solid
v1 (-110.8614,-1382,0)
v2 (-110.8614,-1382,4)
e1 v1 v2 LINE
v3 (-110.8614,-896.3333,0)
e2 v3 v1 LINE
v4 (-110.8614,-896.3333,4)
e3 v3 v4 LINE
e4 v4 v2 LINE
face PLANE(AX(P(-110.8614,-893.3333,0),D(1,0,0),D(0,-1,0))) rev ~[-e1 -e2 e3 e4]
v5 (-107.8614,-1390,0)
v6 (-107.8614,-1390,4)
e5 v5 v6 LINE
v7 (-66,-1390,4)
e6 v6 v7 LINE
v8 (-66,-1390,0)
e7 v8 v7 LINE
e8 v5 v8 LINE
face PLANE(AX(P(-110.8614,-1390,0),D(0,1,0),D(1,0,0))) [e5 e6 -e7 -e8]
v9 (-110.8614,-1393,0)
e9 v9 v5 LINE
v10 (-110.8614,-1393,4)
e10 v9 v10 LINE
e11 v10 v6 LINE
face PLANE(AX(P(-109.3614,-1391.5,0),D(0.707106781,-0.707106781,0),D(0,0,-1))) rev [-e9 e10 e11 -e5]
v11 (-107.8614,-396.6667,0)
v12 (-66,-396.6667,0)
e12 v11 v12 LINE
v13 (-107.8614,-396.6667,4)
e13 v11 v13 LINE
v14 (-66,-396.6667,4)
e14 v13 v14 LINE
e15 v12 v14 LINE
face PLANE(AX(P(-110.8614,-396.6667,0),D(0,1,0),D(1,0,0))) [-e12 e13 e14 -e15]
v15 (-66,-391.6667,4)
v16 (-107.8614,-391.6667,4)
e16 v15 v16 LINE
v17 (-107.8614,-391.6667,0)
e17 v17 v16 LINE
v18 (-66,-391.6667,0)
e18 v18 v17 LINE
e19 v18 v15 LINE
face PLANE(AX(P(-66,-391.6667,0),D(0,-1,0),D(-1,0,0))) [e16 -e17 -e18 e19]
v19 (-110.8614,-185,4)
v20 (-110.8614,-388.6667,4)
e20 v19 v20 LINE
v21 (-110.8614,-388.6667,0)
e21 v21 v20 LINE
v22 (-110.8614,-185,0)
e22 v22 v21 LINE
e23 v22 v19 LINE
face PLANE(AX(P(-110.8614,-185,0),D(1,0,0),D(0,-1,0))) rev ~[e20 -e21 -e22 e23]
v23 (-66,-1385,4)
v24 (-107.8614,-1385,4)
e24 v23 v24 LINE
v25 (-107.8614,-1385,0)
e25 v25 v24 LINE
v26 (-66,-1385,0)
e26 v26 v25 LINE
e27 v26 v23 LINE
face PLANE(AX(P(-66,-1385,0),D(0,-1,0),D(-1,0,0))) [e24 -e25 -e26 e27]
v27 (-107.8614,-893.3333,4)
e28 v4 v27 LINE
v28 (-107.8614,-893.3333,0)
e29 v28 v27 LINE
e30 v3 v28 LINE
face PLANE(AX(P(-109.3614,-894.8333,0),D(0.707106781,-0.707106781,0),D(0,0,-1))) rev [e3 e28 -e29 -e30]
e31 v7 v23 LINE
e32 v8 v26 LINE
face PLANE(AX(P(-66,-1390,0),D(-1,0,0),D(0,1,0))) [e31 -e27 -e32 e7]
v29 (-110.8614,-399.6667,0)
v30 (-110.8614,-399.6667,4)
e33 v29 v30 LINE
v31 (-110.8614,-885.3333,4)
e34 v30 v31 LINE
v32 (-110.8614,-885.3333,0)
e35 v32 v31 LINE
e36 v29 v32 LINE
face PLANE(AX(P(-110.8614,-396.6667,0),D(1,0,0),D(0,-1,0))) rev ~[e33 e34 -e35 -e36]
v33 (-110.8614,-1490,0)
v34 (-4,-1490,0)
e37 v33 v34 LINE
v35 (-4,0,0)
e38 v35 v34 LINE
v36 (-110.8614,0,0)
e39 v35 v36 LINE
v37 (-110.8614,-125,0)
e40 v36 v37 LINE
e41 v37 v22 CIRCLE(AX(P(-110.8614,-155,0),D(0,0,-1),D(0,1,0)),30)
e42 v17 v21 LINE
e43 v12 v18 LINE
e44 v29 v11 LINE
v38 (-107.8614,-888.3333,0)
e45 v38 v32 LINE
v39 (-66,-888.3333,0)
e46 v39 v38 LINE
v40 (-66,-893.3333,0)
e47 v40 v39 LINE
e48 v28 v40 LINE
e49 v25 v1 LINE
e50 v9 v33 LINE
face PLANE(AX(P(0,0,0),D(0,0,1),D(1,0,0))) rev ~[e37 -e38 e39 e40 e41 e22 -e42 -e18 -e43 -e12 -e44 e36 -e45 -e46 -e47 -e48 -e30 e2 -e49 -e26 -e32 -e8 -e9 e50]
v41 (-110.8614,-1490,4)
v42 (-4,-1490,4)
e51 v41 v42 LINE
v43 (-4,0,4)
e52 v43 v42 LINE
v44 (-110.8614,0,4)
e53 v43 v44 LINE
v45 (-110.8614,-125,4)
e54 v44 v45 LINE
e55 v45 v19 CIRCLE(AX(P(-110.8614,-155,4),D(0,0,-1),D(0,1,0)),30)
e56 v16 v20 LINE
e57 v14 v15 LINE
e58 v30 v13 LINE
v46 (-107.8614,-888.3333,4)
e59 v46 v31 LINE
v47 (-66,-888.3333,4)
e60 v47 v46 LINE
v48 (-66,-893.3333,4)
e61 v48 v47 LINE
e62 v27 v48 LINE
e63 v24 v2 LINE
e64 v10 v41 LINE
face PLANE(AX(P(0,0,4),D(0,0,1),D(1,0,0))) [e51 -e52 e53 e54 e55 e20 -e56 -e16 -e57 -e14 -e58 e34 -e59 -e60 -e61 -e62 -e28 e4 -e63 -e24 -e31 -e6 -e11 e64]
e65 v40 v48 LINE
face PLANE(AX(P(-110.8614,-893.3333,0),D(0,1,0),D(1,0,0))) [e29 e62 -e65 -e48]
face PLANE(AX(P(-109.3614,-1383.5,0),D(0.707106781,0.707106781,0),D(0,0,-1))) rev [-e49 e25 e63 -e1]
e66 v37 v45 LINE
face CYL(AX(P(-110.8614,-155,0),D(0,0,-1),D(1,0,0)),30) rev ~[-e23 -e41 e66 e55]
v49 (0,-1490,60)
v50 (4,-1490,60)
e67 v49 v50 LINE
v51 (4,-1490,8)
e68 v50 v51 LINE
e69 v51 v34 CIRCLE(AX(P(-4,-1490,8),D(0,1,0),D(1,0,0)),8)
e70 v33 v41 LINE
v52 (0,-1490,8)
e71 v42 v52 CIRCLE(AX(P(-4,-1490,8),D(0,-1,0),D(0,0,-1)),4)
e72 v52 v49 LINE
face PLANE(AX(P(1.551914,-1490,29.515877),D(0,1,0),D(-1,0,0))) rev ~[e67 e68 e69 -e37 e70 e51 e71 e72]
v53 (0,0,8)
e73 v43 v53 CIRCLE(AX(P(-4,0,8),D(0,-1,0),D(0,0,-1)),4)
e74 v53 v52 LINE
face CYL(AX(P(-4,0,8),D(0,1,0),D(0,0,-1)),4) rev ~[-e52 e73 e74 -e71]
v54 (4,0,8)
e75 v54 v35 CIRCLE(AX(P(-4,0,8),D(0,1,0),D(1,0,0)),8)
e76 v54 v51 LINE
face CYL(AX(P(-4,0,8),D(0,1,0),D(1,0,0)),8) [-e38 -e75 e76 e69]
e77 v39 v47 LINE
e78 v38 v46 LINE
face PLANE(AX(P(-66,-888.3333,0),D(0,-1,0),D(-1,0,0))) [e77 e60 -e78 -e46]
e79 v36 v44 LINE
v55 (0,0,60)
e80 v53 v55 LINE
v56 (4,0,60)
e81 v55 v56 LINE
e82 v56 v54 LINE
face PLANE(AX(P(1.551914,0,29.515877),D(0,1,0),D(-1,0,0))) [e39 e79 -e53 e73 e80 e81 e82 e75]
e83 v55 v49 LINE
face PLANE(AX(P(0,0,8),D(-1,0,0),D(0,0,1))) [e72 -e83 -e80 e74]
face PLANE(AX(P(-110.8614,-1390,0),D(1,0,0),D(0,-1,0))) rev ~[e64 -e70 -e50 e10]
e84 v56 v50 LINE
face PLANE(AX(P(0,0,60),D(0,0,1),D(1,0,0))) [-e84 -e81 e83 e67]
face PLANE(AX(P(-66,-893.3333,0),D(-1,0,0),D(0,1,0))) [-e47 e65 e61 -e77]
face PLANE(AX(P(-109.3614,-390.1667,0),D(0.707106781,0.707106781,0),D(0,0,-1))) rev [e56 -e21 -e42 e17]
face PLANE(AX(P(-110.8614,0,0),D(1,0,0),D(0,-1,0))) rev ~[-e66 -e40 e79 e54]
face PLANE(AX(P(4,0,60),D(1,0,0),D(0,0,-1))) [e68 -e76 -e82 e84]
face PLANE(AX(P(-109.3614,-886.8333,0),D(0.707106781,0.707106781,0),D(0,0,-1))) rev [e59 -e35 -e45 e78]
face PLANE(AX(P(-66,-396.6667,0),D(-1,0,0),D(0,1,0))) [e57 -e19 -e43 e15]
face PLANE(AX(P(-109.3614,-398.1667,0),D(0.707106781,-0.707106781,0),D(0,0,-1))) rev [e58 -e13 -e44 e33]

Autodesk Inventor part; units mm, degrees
ref_plane "YZ Plane" through (0, 0, 0) normal (1, 0, 0) x (0, 1, 0)
ref_plane "XZ Plane" through (0, 0, 0) normal (0, 1, 0) x (-1, 0, 0)
ref_plane "XY Plane" through (0, 0, 0) normal (0, 0, 1) x (1, 0, 0)
sketch "Sketch1" plane through (0, 0, 0) normal (0, 0, 1) x (1, 0, 0)
  line L0 (0, 0) -> (-110.8614, 0)
  line L1 (-110.8614, 0) -> (-110.8614, -1490)
  line L2 (-110.8614, -1490) -> (0, -1490)
  line L3 (0, -1490) -> (0, 0)
  line L4 (-110.8614, -1390) -> (-66, -1390)
  line L5 (-66, -1390) -> (-66, -1385)
  line L6 (-66, -1385) -> (-110.8614, -1385)
  line L7 (-110.8614, -1385) -> (-110.8614, -1390)
  line L8 (-110.8614, -893.3333) -> (-66, -893.3333)
  line L9 (-66, -893.3333) -> (-66, -888.3333)
  line L10 (-66, -888.3333) -> (-110.8614, -888.3333)
  line L11 (-110.8614, -888.3333) -> (-110.8614, -893.3333)
  line L12 (-110.8614, -396.6667) -> (-66, -396.6667)
  line L13 (-66, -396.6667) -> (-66, -391.6667)
  line L14 (-66, -391.6667) -> (-110.8614, -391.6667)
  line L15 (-110.8614, -391.6667) -> (-110.8614, -396.6667)
  circle A0 centre (-110.8614, -155) radius 30
  point P0 (-110.8614, -1385)
  point P1 (-110.8614, -125)
  point P2 (-110.8614, -185)
  dimension "d0" = 1490
  dimension "d1" = 110.8614
  dimension "d2" = 5
  dimension "d4" = 100
  dimension "d7" = 496.6667
  dimension "d23" = 66
  dimension "d28" = 60
  dimension "d29" = 1335
extrude "Plate1" add sketch "Sketch1" along normal blind 4 contours L3 L2 L1 L4 L5 L6 L8 L9 L10 L12 L13 L14 A0 L0
sketch "Sketch2" plane through (4, 0, 0) normal (-1, 0, 0) x (0, -1, 0)
  line L0 (1490, 0) -> (0, 0)
  line L1 (0, 0) -> (0, 60)
  line L2 (0, 60) -> (1490, 60)
  line L3 (1490, 60) -> (1490, 0)
edge flange "Flange1" height 60 angle 90 thickness 4 bend radius 4 thickness toward (-1, 0, 0) relief tear relief width 4 relief depth 2 edges at (0, -745, 4) wall of the first edge with corners at (4, -1490, 0) (4, 0, 0) (4, 0, 60) (4, -1490, 60)
bend "Bend1"
corner "Corner1"
chamfer "Corner Chamfer1" distance 3 angle 45 6 edges at (-110.8614, -1390, 2) (-110.8614, -1385, 2) (-110.8614, -893.3333, 2) (-110.8614, -888.3333, 2) (-110.8614, -391.6667, 2) (-110.8614, -396.6667, 2)
equation "\"d0\" = Стрингер_длина"
equation "\"d1\" = стрингер_глубина_8"
equation "\"d2\" = паз_под_стрингер_толщина"
equation "\"d7\" = 0.333333 * Стрингер_длина"
equation "\"d23\" = паз_под_стрингер_глубина - Thickness"
equation "\"d28\" = 2 * радиус_выреза_под_сварку"
equation "\"d12\" = Thickness"
equation "\"d13\" = BendReliefWidth"
equation "\"d14\" = BendReliefDepth"
equation "\"d15\" = MinimumRemnant"
equation "\"d16\" = TransitionRadius"
equation "\"d17\" = ребро_усилителей"
equation "\"d19\" = BendRadius"
equation "\"d20\" = CornerReliefSize"
equation "\"d21\" = GapSize"
equation "\"d22\" = JacobiRadiusSize"
equation "\"BendRadius\" = Thickness"
equation "\"BendReliefWidth\" = Thickness"
equation "\"BendReliefDepth\" = 0.5 * Thickness"
equation "\"CornerReliefSize\" = 4 * Thickness"
equation "\"MinimumRemnant\" = 2 * Thickness"
equation "\"TransitionRadius\" = BendRadius"
equation "\"JacobiRadiusSize\" = BendRadius"
equation "\"GapSize\" = Thickness"
equation "\"Стрингер_длина\" = 1490"
equation "\"стрингер_глубина_8\" = 110.861434"
equation "\"паз_под_стрингер_толщина\" = 5"
equation "\"паз_под_стрингер_глубина\" = 70"
equation "\"Thickness\" = 4"
equation "\"радиус_выреза_под_сварку\" = 30"
equation "\"ребро_усилителей\" = 60"
properties part number "GBK 1323 stringer 8" material "Steel"
